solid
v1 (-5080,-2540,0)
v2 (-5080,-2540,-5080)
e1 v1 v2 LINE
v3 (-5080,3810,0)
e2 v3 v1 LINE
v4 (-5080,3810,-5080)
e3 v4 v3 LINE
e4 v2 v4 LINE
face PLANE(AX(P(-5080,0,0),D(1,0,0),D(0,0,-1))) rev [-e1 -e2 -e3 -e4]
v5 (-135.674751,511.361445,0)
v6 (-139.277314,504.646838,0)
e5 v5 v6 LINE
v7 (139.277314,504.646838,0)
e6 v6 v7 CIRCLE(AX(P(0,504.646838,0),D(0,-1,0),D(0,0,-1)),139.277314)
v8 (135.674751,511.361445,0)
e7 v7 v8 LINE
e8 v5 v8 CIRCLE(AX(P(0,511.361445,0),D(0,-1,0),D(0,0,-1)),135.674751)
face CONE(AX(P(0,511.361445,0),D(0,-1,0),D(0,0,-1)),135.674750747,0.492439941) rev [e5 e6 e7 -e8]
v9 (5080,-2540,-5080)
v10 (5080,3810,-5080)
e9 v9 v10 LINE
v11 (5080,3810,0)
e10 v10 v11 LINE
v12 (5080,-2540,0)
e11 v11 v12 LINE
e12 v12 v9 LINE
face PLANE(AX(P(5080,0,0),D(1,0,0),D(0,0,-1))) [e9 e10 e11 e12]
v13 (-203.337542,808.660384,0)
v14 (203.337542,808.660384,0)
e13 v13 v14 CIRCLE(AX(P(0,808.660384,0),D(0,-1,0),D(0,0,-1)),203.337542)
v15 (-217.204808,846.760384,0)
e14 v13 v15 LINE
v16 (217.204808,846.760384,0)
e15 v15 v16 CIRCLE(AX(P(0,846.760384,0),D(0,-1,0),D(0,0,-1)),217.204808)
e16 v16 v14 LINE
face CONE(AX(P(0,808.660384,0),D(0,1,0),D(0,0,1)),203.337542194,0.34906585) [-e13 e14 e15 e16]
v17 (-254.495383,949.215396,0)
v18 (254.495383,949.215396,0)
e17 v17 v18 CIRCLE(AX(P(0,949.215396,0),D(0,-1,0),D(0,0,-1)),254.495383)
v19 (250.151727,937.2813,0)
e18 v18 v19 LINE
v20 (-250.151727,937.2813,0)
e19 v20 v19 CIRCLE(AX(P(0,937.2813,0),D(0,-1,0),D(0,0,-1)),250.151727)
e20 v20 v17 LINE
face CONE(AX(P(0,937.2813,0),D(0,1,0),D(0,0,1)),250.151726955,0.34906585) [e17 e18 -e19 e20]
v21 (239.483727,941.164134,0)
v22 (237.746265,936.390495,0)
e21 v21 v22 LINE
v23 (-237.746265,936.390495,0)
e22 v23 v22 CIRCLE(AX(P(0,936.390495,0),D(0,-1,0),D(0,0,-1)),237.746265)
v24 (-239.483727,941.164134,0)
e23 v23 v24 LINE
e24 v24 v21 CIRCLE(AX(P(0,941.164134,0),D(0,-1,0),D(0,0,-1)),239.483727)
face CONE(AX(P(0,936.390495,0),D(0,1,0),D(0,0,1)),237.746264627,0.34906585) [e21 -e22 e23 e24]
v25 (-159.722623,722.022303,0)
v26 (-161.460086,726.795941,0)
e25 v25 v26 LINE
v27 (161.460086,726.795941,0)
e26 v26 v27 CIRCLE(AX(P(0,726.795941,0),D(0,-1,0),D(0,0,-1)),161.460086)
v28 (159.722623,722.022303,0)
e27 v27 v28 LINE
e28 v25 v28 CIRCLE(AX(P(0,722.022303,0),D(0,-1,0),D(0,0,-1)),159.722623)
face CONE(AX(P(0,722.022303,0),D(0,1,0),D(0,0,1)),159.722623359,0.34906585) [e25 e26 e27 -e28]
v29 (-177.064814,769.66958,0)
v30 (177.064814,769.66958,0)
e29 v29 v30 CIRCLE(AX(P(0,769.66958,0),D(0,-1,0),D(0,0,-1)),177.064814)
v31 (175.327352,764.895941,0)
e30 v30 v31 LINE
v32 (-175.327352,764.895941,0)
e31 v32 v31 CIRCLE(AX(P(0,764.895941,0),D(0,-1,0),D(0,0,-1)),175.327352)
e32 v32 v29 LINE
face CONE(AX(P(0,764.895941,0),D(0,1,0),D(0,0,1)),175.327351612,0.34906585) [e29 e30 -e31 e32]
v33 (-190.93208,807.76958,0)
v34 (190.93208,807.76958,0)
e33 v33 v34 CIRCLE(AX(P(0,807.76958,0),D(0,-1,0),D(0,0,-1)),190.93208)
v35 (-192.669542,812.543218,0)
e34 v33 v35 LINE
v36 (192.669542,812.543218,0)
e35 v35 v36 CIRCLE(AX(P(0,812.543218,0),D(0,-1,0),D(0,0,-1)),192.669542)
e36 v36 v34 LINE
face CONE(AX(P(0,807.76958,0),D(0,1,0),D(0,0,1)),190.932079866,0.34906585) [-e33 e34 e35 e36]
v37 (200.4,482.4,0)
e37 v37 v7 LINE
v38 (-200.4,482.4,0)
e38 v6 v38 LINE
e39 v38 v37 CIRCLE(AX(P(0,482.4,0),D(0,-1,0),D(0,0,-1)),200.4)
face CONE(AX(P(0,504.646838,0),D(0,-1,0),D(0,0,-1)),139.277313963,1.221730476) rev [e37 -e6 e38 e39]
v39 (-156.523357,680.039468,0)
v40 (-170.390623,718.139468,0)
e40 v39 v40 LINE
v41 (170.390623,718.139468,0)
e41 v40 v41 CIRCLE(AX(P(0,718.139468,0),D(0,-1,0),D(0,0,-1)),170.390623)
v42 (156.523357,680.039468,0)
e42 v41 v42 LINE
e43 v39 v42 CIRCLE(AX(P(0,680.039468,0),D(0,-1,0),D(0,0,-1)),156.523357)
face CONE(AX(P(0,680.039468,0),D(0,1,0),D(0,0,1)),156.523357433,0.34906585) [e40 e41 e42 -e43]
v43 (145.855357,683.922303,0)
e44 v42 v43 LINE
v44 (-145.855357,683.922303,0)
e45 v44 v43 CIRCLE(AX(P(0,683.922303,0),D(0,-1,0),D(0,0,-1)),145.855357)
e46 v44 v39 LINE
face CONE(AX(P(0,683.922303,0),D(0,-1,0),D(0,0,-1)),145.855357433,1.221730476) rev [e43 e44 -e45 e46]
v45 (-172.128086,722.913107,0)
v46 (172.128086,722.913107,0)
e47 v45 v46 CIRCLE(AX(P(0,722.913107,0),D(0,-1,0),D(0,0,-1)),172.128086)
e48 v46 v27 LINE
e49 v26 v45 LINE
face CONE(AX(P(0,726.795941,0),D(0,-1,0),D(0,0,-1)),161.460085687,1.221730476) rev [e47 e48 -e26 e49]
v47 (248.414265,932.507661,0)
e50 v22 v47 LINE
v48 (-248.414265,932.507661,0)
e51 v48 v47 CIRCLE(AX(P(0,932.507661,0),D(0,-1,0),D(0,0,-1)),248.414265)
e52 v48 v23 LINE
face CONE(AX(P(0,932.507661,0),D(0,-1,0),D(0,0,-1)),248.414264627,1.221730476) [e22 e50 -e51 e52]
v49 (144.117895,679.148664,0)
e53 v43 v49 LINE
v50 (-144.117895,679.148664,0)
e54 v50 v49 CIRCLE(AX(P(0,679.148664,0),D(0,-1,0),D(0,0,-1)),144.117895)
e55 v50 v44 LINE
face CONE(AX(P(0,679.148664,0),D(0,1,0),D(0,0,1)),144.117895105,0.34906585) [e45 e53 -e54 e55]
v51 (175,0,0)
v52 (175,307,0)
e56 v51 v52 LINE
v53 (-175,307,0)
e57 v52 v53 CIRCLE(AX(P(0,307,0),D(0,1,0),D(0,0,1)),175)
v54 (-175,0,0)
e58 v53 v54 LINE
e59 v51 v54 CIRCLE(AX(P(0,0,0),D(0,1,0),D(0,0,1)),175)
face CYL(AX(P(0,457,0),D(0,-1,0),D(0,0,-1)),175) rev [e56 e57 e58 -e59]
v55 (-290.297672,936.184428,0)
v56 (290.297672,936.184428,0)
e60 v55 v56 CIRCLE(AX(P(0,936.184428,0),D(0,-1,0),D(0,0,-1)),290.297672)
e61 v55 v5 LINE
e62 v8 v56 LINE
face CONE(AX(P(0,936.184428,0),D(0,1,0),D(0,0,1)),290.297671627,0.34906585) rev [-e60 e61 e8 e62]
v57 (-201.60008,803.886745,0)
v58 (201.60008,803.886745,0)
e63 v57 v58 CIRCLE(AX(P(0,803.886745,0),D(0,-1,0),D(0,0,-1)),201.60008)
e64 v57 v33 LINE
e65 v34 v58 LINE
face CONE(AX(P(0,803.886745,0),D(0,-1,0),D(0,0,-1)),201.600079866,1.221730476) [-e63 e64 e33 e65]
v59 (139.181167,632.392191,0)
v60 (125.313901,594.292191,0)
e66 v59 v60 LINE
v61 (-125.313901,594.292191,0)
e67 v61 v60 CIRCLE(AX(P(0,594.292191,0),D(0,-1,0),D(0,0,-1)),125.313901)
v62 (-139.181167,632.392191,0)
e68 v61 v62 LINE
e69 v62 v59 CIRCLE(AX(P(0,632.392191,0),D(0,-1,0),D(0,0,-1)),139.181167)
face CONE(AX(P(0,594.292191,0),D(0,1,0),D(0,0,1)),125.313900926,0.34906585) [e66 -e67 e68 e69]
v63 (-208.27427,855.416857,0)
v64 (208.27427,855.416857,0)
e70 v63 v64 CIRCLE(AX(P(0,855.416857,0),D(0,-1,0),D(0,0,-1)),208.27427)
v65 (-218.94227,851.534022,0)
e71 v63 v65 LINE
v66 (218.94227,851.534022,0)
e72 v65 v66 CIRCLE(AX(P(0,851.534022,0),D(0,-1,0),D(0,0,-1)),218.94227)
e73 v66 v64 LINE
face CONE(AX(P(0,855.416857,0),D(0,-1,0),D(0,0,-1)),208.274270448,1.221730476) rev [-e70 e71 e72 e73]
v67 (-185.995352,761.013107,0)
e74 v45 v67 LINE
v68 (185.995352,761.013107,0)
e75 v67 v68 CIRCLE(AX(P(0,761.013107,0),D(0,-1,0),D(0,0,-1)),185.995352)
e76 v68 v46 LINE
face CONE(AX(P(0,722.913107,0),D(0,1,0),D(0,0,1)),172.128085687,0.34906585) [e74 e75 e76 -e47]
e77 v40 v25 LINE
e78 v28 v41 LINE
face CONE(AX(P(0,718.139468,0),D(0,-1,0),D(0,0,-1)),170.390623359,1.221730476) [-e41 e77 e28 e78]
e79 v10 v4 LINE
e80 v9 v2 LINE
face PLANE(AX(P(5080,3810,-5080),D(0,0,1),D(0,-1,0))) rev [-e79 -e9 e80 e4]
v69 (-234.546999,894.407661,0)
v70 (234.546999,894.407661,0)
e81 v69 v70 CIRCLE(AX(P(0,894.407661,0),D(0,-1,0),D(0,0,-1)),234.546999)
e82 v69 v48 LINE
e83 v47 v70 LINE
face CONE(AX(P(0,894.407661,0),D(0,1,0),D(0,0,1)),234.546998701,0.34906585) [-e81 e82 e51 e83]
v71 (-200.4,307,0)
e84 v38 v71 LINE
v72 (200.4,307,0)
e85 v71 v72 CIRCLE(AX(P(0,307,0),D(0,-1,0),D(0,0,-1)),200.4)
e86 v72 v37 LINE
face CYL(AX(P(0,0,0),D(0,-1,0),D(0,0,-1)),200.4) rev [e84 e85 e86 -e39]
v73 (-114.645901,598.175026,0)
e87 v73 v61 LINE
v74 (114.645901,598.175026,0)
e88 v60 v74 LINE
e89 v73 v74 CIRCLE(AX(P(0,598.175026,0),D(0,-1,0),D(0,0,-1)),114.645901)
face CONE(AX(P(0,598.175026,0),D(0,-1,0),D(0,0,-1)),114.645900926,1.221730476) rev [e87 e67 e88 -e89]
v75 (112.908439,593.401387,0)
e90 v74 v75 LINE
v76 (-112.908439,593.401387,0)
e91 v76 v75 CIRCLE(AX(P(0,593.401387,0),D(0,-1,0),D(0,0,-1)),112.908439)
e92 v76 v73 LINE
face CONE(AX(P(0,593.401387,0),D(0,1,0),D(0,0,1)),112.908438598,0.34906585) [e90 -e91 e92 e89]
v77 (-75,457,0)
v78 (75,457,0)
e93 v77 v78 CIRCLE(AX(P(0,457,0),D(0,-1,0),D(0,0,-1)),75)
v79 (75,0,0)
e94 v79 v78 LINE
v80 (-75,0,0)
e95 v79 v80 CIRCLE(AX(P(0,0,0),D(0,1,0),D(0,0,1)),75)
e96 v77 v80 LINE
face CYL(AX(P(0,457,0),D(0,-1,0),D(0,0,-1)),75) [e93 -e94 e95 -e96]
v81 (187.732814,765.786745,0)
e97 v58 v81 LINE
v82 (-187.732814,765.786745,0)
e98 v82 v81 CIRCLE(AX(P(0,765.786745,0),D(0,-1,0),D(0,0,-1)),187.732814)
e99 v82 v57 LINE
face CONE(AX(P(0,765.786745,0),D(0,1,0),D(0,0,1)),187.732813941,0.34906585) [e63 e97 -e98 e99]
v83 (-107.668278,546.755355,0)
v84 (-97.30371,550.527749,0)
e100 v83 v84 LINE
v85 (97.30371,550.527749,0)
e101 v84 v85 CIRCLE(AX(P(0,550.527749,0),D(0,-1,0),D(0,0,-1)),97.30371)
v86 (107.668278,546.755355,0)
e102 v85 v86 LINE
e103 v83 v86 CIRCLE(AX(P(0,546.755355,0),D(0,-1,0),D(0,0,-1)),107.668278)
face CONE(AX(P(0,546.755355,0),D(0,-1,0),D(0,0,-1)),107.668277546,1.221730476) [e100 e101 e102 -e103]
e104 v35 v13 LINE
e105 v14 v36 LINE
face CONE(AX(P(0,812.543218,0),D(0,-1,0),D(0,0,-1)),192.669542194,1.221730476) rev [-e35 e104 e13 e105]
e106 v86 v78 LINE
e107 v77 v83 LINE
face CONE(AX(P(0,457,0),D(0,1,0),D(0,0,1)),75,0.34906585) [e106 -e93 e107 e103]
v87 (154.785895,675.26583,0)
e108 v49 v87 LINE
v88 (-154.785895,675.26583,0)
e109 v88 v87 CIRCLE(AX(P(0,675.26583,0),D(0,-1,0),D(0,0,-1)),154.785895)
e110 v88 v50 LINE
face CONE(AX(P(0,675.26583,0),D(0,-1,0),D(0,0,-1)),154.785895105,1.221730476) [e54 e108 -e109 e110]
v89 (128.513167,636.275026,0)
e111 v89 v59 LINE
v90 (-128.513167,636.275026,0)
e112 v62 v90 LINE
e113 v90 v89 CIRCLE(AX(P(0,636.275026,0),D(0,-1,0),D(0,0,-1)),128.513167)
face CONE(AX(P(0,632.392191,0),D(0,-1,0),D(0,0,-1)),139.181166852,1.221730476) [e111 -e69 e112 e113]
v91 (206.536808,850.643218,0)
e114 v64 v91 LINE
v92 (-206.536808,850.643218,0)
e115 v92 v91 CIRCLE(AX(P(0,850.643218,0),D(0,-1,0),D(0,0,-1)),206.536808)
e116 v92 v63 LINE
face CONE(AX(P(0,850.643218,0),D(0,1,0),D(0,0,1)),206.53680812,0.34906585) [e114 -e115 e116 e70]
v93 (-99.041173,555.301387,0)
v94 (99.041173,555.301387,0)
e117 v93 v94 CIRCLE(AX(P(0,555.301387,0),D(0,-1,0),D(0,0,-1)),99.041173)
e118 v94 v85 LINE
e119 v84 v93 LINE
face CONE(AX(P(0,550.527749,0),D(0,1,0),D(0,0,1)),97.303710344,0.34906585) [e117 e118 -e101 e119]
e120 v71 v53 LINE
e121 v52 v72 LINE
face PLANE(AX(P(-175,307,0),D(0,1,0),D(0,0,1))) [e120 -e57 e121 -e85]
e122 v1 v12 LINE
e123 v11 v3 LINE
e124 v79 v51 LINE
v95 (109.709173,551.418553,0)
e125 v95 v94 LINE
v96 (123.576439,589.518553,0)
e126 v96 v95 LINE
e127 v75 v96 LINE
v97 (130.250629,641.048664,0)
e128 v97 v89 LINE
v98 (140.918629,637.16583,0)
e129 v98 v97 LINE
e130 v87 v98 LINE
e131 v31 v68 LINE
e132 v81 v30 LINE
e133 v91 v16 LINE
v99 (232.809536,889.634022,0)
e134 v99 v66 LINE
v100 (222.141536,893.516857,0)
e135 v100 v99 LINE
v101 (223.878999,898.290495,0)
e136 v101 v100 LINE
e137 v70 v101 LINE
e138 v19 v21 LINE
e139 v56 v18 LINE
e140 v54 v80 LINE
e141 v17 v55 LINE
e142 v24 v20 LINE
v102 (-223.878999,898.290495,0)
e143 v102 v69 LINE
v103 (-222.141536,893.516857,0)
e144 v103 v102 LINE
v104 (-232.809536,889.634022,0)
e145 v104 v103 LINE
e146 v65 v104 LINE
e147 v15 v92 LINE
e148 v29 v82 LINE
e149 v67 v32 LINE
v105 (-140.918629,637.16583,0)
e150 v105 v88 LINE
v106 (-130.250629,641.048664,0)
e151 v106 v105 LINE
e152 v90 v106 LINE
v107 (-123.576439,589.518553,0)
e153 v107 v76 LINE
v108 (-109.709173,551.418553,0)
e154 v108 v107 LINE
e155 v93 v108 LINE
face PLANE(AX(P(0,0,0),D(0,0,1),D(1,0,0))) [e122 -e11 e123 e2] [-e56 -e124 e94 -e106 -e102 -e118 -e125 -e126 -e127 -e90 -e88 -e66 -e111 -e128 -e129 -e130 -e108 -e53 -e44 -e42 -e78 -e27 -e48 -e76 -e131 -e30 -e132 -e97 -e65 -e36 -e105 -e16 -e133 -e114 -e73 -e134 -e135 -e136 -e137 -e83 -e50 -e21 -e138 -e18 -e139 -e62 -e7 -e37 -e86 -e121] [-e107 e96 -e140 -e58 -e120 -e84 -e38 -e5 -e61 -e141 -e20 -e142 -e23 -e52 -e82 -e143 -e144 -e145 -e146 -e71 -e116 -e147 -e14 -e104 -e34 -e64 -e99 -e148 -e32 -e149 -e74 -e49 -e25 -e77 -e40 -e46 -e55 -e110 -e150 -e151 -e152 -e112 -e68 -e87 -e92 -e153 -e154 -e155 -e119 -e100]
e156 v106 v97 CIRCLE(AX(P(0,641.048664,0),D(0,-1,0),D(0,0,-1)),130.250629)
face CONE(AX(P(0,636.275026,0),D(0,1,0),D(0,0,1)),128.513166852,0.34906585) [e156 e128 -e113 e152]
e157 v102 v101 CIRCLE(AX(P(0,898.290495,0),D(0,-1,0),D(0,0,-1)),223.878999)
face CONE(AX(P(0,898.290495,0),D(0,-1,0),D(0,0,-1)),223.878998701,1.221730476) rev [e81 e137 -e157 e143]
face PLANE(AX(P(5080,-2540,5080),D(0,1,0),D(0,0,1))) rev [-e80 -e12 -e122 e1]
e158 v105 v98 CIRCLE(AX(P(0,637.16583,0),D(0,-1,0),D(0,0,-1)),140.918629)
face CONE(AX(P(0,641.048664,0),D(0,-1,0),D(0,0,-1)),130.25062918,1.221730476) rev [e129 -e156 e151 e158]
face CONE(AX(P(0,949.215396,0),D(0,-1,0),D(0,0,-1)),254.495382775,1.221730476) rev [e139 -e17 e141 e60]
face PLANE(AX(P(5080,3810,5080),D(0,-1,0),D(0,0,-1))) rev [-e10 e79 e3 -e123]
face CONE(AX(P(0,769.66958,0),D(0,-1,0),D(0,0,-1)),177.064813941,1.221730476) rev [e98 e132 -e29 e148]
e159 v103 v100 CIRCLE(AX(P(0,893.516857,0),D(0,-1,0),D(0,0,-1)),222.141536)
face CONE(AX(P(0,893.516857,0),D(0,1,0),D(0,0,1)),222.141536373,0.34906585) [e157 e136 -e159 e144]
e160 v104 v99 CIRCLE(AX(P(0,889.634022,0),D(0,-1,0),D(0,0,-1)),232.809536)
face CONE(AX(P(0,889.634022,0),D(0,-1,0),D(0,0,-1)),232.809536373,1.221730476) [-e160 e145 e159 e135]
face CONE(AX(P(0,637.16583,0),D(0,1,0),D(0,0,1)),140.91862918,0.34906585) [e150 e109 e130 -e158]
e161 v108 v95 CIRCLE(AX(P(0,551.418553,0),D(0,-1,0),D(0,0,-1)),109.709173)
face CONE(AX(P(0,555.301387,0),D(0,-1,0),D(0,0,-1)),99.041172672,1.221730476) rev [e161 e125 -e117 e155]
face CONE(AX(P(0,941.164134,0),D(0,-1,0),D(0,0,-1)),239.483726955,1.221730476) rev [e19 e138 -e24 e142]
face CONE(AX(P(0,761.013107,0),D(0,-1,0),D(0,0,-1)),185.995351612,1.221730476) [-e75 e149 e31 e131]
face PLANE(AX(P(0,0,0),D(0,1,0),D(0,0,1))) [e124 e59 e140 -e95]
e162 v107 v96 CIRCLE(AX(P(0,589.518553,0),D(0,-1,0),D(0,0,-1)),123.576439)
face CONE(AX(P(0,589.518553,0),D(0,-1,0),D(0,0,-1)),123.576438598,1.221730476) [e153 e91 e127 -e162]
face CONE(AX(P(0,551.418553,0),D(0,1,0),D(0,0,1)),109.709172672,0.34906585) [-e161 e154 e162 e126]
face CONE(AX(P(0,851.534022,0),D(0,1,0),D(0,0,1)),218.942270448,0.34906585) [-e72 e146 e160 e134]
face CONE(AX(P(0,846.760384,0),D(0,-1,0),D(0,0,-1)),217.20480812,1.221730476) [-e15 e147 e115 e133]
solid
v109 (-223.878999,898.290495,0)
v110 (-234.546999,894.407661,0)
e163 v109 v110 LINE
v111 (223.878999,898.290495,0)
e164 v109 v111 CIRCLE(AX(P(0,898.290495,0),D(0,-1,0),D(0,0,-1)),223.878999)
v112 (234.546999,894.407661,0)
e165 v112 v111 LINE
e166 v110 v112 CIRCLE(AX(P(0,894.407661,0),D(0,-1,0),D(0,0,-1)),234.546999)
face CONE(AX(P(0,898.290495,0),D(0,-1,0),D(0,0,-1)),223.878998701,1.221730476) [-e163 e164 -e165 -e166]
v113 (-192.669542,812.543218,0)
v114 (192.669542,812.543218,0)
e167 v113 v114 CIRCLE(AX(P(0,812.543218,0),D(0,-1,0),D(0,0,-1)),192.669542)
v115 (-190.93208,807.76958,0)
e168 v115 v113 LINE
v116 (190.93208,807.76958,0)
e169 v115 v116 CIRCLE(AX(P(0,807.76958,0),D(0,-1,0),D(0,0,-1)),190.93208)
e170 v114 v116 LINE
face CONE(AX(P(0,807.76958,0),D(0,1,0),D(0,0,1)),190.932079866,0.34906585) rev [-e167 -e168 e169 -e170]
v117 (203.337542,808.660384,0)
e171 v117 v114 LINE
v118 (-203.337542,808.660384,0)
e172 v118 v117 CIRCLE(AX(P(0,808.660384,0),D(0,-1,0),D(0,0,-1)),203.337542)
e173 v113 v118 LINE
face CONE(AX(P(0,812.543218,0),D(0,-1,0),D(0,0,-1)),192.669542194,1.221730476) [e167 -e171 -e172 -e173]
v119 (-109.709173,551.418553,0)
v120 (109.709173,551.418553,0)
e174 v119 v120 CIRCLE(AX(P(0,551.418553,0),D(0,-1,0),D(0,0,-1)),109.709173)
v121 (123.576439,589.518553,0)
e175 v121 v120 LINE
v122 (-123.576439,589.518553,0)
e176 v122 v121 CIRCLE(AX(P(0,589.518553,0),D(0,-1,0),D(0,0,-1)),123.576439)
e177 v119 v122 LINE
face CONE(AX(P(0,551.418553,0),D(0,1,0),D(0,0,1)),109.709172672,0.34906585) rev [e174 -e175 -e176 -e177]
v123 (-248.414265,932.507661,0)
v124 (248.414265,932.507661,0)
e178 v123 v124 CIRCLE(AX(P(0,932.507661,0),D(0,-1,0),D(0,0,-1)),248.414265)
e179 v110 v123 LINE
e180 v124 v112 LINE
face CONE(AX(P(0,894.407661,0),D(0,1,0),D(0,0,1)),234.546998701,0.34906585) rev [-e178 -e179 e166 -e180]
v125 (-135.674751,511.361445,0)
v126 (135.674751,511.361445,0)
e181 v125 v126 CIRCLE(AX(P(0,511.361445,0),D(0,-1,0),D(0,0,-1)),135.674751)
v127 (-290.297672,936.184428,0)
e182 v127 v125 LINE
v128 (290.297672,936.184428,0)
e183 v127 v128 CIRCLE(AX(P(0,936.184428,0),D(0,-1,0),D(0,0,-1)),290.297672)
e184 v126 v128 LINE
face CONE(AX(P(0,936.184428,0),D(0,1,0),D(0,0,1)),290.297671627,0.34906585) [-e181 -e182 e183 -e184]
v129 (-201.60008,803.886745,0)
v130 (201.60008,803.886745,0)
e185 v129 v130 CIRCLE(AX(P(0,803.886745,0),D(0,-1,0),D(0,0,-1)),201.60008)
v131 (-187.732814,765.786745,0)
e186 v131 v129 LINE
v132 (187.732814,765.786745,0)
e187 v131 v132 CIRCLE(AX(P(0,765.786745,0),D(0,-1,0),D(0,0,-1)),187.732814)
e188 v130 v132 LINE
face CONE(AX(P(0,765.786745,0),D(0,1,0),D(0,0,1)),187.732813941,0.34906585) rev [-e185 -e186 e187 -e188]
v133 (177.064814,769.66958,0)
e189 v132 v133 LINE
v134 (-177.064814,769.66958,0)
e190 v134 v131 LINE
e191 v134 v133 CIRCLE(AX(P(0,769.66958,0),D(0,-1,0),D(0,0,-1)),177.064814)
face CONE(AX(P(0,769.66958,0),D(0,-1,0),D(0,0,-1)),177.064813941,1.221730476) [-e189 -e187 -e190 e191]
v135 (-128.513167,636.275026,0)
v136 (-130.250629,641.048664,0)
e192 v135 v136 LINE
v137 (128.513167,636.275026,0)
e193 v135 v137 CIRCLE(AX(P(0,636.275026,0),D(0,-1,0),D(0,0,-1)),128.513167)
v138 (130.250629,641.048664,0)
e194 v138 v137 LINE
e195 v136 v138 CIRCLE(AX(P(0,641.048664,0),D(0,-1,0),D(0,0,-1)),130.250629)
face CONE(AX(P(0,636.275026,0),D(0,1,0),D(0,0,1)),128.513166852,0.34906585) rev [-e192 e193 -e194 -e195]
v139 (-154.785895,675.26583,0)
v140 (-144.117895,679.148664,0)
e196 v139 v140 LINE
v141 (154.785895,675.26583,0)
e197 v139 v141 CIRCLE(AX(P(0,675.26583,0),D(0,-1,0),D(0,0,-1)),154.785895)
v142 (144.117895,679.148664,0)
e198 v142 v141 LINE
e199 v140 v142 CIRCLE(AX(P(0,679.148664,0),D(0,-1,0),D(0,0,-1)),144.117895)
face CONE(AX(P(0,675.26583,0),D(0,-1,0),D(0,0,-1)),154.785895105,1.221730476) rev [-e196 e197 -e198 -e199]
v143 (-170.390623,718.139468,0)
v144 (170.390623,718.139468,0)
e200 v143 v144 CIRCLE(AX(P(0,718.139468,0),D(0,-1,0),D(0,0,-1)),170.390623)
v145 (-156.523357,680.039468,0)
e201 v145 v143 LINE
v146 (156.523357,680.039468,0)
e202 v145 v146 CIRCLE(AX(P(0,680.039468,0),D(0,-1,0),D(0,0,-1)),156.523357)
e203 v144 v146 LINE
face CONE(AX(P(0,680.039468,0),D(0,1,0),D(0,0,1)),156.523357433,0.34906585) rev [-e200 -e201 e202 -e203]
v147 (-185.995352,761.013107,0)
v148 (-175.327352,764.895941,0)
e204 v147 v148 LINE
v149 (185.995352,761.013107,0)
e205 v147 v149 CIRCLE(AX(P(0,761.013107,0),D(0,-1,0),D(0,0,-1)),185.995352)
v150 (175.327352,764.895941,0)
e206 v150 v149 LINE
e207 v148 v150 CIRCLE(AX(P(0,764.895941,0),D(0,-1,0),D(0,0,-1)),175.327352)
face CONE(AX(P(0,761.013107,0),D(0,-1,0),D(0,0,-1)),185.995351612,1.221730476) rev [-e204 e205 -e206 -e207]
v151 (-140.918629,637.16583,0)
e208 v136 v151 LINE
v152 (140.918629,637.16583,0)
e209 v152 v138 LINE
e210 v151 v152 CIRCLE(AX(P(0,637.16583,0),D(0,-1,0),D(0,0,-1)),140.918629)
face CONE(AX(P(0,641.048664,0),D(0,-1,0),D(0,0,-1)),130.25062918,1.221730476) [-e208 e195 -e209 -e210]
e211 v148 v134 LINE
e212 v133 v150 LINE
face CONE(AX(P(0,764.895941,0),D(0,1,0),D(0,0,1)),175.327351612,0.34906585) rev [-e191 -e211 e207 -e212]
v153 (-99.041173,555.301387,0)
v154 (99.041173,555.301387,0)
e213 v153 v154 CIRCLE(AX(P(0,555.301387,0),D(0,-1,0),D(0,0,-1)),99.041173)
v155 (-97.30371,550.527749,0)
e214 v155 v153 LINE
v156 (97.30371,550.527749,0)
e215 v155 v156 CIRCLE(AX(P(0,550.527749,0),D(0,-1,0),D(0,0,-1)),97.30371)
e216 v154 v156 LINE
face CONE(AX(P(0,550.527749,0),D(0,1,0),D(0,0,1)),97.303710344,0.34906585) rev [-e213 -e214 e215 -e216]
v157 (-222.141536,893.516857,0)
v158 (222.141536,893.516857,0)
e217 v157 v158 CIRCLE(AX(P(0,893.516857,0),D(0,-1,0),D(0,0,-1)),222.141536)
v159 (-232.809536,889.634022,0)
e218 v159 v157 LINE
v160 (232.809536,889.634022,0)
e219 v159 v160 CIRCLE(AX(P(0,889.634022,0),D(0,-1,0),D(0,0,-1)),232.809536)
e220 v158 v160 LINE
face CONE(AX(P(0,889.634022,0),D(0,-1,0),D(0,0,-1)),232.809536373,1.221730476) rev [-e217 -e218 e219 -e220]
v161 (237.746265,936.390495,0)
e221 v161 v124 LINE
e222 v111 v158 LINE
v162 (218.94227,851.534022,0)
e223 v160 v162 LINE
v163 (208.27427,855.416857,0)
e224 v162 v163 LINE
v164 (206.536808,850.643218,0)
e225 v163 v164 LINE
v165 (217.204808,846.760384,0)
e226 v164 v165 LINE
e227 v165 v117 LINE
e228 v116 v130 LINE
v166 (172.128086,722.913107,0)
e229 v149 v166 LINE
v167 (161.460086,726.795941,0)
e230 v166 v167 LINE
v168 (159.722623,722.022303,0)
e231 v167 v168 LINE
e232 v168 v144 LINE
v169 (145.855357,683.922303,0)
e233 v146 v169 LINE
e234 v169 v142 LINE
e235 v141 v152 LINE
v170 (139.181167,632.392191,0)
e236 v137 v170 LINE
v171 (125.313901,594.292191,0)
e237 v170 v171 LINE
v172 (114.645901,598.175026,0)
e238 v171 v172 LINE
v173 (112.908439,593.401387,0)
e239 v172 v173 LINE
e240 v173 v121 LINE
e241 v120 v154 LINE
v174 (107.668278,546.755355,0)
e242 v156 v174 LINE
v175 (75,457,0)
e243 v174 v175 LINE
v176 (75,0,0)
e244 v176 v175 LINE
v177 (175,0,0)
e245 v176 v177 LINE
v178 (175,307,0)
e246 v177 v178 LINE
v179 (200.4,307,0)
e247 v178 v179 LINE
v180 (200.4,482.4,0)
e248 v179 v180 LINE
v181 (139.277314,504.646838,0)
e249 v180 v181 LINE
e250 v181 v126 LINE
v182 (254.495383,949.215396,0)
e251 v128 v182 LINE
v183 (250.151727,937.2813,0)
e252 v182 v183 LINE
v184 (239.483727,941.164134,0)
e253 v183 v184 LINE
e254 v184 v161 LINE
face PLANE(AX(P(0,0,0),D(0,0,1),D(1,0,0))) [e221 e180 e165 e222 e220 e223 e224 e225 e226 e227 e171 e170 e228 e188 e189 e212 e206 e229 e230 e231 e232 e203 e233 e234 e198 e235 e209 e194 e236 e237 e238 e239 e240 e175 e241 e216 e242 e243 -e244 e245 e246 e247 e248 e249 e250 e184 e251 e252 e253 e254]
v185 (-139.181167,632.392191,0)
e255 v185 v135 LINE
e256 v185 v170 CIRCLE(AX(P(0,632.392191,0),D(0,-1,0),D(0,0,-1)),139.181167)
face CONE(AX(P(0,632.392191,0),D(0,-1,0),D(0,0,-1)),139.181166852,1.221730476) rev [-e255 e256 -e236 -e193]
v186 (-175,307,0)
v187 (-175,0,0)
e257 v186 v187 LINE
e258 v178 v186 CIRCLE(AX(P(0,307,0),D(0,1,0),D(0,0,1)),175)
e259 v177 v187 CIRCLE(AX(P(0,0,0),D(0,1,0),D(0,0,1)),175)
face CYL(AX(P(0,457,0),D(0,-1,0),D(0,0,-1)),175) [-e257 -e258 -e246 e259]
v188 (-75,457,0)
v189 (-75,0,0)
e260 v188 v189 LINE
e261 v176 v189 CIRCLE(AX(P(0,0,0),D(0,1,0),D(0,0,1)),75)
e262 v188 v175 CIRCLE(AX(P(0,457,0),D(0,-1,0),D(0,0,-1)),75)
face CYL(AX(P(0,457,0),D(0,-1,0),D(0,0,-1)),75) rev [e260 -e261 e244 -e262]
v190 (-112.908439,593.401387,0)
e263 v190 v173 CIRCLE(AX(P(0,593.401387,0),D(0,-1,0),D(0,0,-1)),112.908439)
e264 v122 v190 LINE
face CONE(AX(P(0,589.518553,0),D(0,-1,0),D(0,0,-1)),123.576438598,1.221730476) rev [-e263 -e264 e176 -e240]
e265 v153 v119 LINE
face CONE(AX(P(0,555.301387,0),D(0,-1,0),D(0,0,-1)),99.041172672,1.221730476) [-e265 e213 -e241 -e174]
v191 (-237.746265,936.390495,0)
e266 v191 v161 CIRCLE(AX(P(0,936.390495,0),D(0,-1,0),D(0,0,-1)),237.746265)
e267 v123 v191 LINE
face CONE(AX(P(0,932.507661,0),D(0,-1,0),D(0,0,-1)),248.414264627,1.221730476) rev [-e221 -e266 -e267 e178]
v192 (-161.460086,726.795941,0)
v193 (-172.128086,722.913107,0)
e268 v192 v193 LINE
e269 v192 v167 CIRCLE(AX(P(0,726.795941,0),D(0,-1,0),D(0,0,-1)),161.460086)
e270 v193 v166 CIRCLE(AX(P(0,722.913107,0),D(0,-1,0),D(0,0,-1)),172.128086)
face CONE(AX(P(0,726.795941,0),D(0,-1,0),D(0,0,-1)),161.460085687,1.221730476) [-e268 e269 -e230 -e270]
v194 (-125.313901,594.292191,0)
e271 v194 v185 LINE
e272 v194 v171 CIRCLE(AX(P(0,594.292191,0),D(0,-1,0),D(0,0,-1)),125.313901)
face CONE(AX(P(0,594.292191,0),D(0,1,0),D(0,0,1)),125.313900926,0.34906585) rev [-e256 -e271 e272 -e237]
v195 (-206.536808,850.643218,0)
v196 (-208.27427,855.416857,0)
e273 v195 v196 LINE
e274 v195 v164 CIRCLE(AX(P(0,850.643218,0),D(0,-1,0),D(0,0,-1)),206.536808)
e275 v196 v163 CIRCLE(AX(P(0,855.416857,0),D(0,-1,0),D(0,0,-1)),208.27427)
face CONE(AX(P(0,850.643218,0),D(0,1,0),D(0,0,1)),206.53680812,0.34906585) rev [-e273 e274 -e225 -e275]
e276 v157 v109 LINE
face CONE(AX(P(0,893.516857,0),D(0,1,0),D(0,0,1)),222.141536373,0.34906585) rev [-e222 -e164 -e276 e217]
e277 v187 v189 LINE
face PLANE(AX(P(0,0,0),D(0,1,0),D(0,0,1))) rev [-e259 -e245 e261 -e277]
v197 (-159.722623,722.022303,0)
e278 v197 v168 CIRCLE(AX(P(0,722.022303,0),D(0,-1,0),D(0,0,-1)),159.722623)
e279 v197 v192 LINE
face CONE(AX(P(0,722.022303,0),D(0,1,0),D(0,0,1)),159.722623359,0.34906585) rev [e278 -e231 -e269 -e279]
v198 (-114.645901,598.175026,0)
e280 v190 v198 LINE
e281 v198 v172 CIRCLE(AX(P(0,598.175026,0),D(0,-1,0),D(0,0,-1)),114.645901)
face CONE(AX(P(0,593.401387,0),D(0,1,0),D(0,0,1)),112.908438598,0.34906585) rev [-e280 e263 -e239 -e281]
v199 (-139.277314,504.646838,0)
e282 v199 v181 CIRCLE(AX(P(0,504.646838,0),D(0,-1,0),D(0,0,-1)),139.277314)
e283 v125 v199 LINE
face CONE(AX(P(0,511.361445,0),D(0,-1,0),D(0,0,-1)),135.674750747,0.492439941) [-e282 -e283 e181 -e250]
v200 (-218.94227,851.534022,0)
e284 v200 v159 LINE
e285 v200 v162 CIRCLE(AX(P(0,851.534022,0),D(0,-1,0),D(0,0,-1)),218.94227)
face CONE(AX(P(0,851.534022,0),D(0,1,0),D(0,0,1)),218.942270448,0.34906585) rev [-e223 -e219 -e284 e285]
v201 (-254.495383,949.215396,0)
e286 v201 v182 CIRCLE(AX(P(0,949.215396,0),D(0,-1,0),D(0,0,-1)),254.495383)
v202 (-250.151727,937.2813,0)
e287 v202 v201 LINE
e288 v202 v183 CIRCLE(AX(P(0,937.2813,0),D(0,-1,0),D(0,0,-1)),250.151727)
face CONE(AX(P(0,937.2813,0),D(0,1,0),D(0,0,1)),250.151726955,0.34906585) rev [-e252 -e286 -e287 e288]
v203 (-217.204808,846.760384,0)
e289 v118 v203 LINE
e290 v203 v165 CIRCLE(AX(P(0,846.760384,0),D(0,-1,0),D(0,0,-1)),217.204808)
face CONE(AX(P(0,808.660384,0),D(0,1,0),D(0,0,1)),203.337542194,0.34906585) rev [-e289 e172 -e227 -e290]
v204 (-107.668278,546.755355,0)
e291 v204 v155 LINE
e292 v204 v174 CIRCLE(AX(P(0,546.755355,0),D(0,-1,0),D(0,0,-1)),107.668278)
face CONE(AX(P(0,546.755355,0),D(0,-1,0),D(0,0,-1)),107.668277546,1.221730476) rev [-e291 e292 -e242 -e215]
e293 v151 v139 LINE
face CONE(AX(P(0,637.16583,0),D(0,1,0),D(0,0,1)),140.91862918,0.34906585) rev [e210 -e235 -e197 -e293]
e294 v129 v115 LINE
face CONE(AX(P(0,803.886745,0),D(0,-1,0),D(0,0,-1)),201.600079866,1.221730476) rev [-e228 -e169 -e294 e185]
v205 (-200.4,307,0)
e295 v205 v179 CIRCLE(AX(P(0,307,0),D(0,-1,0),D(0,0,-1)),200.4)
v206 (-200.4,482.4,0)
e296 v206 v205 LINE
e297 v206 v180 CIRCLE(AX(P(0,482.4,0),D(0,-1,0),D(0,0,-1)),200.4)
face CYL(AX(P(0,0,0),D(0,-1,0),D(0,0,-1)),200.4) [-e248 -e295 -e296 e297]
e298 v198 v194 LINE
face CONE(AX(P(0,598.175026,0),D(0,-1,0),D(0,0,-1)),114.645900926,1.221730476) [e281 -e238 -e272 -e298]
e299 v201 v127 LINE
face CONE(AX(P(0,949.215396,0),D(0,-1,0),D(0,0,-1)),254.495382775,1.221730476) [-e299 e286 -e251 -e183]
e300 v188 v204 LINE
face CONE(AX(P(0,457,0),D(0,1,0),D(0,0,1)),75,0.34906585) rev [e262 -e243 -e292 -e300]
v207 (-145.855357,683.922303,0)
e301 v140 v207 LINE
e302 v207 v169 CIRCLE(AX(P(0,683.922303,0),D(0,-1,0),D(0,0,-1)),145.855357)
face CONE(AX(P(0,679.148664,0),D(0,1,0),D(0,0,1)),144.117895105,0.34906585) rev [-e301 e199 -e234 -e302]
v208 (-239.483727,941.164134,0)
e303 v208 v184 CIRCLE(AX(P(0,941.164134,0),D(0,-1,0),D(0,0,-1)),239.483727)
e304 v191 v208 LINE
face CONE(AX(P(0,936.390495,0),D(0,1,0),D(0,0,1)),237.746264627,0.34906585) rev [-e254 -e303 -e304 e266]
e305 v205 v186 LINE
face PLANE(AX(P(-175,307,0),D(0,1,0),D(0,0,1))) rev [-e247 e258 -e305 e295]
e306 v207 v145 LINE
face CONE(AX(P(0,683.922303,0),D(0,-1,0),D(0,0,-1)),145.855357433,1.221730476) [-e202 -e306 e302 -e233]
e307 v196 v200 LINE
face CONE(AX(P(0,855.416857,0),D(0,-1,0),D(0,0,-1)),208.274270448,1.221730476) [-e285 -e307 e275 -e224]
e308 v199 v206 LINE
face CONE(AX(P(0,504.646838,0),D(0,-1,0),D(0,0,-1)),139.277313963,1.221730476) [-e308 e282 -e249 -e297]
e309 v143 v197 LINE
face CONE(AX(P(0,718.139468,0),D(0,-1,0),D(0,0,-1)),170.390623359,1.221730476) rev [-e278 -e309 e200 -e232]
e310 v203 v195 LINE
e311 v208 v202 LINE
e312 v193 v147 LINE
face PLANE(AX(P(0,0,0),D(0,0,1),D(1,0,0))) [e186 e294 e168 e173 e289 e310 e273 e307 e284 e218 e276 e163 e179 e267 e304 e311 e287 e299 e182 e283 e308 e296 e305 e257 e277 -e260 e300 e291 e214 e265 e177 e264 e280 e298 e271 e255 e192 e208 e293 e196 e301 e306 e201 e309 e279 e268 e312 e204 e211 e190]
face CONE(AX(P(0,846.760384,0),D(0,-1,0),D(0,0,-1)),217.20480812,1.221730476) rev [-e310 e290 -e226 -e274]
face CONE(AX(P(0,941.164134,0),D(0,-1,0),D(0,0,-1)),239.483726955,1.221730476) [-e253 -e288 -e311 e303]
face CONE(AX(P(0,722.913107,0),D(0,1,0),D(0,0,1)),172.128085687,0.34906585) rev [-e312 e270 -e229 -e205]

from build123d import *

# Parameters (mm, degrees)
SKETCH1_R           = 175
SKETCH1_R_2         = 75
BOSS_EXTRUDE1_DEPTH = 457
SKETCH3_W           = 10160
SKETCH3_H           = 6350
BOSS_EXTRUDE2_DEPTH = 5080
SKETCH4_W           = 13475.768327993
SKETCH4_H           = 8367.586519284
CUT_EXTRUDE1_DEPTH  = 8132.96778154


# Read off the part's stored shape, not the designer's step: Intersect1
with BuildPart() as part:
    # Sketch1 → Boss-Extrude1 (new body)
    with BuildSketch(Plane(origin=(0, 0, 0), x_dir=(1, 0, 0), z_dir=(0, 1, 0))):
        with Locations(Location((0, 0, 0), (0, 0, 270))):
            Circle(SKETCH1_R)
        with Locations(Location((0, 0, 0), (0, 0, 270))):
            Circle(SKETCH1_R_2, mode=Mode.SUBTRACT)
    extrude(amount=BOSS_EXTRUDE1_DEPTH)

    # Sketch2 → Revolve1 (revolve)
    with BuildSketch(Plane.XY, mode=Mode.PRIVATE) as revolve1_sk:
        Polygon((-175, 307), (-200.4, 307), (-200.4, 482.4), (-139.277313963, 504.646838356), (-135.674750747, 511.361444694), (-290.297671627, 936.184428342), (-254.495382775, 949.215395803), (-250.151726955, 937.281299519), (-239.483726955, 941.164133978), (-237.746264627, 936.390495464), (-248.414264627, 932.507661005), (-234.546998701, 894.407661005), (-223.878998701, 898.290495464), (-222.141536373, 893.516856951), (-232.809536373, 889.634022491), (-218.942270448, 851.534022491), (-208.274270448, 855.416856951), (-206.53680812, 850.643218437), (-217.20480812, 846.760383978), (-203.337542194, 808.660383978), (-192.669542194, 812.543218437), (-190.932079866, 807.769579923), (-201.600079866, 803.886745464), (-187.732813941, 765.786745464), (-177.064813941, 769.669579923), (-175.327351612, 764.89594141), (-185.995351612, 761.013106951), (-172.128085687, 722.913106951), (-161.460085687, 726.79594141), (-159.722623359, 722.022302896), (-170.390623359, 718.139468437), (-156.523357433, 680.039468437), (-145.855357433, 683.922302896), (-144.117895105, 679.148664383), (-154.785895105, 675.265829923), (-140.91862918, 637.165829923), (-130.25062918, 641.048664383), (-128.513166852, 636.275025869), (-139.181166852, 632.39219141), (-125.313900926, 594.29219141), (-114.645900926, 598.175025869), (-112.908438598, 593.401387355), (-123.576438598, 589.518552896), (-109.709172672, 551.418552896), (-99.041172672, 555.301387355), (-97.303710344, 550.527748842), (-107.668277546, 546.755354889), (-101.061934921, 528.604577704), (-75, 457), (-175, 457), align=None)
    revolve(revolve1_sk.sketch.rotate(Axis((0, 0, 0), (0, 1, 0)), 270), axis=Axis((0, 0, 0), (0, 1, 0)))


with BuildPart() as body_2:
    # Sketch3 → Boss-Extrude2 (new, symmetric)
    with BuildSketch(Plane(origin=(0, 0, 0), x_dir=(0, 0, -1), z_dir=(1, 0, 0))):
        with Locations((0, 635)):
            Rectangle(SKETCH3_W, SKETCH3_H)
    extrude(amount=BOSS_EXTRUDE2_DEPTH, both=True)

    # Intersect1 outline → Intersect1 (revolve, cut)
    with BuildSketch(Plane.XY):
        Polygon((107.668277546, 546.755354889), (75, 457), (75, 0), (175, 0), (175, 307), (200.4, 307), (200.4, 482.4), (139.277313963, 504.646838356), (135.674750747, 511.361444694), (290.297671627, 936.184428342), (254.495382775, 949.215395803), (250.151726955, 937.281299519), (239.483726955, 941.164133978), (237.746264627, 936.390495464), (248.414264627, 932.507661005), (234.546998701, 894.407661005), (223.878998701, 898.290495464), (222.141536373, 893.516856951), (232.809536373, 889.634022491), (218.942270448, 851.534022491), (208.274270448, 855.416856951), (206.53680812, 850.643218437), (217.20480812, 846.760383978), (203.337542194, 808.660383978), (192.669542194, 812.543218437), (190.932079866, 807.769579923), (201.600079866, 803.886745464), (187.732813941, 765.786745464), (177.064813941, 769.669579923), (175.327351612, 764.89594141), (185.995351612, 761.013106951), (172.128085687, 722.913106951), (161.460085687, 726.79594141), (159.722623359, 722.022302896), (170.390623359, 718.139468437), (156.523357433, 680.039468437), (145.855357433, 683.922302896), (144.117895105, 679.148664383), (154.785895105, 675.265829923), (140.91862918, 637.165829923), (130.25062918, 641.048664383), (128.513166852, 636.275025869), (139.181166852, 632.39219141), (125.313900926, 594.29219141), (114.645900926, 598.175025869), (112.908438598, 593.401387355), (123.576438598, 589.518552896), (109.709172672, 551.418552896), (99.041172672, 555.301387355), (97.303710344, 550.527748842), align=None)
    revolve(axis=Axis((0, 0, 0), (0, 1, 0)), mode=Mode.SUBTRACT)


with BuildPart() as cut_extrude1_tool:
    # Sketch4 → Cut-Extrude1 (new, through all)
    with BuildSketch(Plane.XY):
        with Locations((454.179344916, 464.014834855)):
            Rectangle(SKETCH4_W, SKETCH4_H)
    extrude(amount=CUT_EXTRUDE1_DEPTH)


with BuildPart() as part_1:
    add(part.part)

    # Cut-Extrude1: cut by cut_extrude1_tool
    add(cut_extrude1_tool.part, mode=Mode.SUBTRACT)


with BuildPart() as body_2_1:
    add(body_2.part)

    # Cut-Extrude1: cut by cut_extrude1_tool
    add(cut_extrude1_tool.part, mode=Mode.SUBTRACT)


solid = Compound([part_1.part, body_2_1.part])
